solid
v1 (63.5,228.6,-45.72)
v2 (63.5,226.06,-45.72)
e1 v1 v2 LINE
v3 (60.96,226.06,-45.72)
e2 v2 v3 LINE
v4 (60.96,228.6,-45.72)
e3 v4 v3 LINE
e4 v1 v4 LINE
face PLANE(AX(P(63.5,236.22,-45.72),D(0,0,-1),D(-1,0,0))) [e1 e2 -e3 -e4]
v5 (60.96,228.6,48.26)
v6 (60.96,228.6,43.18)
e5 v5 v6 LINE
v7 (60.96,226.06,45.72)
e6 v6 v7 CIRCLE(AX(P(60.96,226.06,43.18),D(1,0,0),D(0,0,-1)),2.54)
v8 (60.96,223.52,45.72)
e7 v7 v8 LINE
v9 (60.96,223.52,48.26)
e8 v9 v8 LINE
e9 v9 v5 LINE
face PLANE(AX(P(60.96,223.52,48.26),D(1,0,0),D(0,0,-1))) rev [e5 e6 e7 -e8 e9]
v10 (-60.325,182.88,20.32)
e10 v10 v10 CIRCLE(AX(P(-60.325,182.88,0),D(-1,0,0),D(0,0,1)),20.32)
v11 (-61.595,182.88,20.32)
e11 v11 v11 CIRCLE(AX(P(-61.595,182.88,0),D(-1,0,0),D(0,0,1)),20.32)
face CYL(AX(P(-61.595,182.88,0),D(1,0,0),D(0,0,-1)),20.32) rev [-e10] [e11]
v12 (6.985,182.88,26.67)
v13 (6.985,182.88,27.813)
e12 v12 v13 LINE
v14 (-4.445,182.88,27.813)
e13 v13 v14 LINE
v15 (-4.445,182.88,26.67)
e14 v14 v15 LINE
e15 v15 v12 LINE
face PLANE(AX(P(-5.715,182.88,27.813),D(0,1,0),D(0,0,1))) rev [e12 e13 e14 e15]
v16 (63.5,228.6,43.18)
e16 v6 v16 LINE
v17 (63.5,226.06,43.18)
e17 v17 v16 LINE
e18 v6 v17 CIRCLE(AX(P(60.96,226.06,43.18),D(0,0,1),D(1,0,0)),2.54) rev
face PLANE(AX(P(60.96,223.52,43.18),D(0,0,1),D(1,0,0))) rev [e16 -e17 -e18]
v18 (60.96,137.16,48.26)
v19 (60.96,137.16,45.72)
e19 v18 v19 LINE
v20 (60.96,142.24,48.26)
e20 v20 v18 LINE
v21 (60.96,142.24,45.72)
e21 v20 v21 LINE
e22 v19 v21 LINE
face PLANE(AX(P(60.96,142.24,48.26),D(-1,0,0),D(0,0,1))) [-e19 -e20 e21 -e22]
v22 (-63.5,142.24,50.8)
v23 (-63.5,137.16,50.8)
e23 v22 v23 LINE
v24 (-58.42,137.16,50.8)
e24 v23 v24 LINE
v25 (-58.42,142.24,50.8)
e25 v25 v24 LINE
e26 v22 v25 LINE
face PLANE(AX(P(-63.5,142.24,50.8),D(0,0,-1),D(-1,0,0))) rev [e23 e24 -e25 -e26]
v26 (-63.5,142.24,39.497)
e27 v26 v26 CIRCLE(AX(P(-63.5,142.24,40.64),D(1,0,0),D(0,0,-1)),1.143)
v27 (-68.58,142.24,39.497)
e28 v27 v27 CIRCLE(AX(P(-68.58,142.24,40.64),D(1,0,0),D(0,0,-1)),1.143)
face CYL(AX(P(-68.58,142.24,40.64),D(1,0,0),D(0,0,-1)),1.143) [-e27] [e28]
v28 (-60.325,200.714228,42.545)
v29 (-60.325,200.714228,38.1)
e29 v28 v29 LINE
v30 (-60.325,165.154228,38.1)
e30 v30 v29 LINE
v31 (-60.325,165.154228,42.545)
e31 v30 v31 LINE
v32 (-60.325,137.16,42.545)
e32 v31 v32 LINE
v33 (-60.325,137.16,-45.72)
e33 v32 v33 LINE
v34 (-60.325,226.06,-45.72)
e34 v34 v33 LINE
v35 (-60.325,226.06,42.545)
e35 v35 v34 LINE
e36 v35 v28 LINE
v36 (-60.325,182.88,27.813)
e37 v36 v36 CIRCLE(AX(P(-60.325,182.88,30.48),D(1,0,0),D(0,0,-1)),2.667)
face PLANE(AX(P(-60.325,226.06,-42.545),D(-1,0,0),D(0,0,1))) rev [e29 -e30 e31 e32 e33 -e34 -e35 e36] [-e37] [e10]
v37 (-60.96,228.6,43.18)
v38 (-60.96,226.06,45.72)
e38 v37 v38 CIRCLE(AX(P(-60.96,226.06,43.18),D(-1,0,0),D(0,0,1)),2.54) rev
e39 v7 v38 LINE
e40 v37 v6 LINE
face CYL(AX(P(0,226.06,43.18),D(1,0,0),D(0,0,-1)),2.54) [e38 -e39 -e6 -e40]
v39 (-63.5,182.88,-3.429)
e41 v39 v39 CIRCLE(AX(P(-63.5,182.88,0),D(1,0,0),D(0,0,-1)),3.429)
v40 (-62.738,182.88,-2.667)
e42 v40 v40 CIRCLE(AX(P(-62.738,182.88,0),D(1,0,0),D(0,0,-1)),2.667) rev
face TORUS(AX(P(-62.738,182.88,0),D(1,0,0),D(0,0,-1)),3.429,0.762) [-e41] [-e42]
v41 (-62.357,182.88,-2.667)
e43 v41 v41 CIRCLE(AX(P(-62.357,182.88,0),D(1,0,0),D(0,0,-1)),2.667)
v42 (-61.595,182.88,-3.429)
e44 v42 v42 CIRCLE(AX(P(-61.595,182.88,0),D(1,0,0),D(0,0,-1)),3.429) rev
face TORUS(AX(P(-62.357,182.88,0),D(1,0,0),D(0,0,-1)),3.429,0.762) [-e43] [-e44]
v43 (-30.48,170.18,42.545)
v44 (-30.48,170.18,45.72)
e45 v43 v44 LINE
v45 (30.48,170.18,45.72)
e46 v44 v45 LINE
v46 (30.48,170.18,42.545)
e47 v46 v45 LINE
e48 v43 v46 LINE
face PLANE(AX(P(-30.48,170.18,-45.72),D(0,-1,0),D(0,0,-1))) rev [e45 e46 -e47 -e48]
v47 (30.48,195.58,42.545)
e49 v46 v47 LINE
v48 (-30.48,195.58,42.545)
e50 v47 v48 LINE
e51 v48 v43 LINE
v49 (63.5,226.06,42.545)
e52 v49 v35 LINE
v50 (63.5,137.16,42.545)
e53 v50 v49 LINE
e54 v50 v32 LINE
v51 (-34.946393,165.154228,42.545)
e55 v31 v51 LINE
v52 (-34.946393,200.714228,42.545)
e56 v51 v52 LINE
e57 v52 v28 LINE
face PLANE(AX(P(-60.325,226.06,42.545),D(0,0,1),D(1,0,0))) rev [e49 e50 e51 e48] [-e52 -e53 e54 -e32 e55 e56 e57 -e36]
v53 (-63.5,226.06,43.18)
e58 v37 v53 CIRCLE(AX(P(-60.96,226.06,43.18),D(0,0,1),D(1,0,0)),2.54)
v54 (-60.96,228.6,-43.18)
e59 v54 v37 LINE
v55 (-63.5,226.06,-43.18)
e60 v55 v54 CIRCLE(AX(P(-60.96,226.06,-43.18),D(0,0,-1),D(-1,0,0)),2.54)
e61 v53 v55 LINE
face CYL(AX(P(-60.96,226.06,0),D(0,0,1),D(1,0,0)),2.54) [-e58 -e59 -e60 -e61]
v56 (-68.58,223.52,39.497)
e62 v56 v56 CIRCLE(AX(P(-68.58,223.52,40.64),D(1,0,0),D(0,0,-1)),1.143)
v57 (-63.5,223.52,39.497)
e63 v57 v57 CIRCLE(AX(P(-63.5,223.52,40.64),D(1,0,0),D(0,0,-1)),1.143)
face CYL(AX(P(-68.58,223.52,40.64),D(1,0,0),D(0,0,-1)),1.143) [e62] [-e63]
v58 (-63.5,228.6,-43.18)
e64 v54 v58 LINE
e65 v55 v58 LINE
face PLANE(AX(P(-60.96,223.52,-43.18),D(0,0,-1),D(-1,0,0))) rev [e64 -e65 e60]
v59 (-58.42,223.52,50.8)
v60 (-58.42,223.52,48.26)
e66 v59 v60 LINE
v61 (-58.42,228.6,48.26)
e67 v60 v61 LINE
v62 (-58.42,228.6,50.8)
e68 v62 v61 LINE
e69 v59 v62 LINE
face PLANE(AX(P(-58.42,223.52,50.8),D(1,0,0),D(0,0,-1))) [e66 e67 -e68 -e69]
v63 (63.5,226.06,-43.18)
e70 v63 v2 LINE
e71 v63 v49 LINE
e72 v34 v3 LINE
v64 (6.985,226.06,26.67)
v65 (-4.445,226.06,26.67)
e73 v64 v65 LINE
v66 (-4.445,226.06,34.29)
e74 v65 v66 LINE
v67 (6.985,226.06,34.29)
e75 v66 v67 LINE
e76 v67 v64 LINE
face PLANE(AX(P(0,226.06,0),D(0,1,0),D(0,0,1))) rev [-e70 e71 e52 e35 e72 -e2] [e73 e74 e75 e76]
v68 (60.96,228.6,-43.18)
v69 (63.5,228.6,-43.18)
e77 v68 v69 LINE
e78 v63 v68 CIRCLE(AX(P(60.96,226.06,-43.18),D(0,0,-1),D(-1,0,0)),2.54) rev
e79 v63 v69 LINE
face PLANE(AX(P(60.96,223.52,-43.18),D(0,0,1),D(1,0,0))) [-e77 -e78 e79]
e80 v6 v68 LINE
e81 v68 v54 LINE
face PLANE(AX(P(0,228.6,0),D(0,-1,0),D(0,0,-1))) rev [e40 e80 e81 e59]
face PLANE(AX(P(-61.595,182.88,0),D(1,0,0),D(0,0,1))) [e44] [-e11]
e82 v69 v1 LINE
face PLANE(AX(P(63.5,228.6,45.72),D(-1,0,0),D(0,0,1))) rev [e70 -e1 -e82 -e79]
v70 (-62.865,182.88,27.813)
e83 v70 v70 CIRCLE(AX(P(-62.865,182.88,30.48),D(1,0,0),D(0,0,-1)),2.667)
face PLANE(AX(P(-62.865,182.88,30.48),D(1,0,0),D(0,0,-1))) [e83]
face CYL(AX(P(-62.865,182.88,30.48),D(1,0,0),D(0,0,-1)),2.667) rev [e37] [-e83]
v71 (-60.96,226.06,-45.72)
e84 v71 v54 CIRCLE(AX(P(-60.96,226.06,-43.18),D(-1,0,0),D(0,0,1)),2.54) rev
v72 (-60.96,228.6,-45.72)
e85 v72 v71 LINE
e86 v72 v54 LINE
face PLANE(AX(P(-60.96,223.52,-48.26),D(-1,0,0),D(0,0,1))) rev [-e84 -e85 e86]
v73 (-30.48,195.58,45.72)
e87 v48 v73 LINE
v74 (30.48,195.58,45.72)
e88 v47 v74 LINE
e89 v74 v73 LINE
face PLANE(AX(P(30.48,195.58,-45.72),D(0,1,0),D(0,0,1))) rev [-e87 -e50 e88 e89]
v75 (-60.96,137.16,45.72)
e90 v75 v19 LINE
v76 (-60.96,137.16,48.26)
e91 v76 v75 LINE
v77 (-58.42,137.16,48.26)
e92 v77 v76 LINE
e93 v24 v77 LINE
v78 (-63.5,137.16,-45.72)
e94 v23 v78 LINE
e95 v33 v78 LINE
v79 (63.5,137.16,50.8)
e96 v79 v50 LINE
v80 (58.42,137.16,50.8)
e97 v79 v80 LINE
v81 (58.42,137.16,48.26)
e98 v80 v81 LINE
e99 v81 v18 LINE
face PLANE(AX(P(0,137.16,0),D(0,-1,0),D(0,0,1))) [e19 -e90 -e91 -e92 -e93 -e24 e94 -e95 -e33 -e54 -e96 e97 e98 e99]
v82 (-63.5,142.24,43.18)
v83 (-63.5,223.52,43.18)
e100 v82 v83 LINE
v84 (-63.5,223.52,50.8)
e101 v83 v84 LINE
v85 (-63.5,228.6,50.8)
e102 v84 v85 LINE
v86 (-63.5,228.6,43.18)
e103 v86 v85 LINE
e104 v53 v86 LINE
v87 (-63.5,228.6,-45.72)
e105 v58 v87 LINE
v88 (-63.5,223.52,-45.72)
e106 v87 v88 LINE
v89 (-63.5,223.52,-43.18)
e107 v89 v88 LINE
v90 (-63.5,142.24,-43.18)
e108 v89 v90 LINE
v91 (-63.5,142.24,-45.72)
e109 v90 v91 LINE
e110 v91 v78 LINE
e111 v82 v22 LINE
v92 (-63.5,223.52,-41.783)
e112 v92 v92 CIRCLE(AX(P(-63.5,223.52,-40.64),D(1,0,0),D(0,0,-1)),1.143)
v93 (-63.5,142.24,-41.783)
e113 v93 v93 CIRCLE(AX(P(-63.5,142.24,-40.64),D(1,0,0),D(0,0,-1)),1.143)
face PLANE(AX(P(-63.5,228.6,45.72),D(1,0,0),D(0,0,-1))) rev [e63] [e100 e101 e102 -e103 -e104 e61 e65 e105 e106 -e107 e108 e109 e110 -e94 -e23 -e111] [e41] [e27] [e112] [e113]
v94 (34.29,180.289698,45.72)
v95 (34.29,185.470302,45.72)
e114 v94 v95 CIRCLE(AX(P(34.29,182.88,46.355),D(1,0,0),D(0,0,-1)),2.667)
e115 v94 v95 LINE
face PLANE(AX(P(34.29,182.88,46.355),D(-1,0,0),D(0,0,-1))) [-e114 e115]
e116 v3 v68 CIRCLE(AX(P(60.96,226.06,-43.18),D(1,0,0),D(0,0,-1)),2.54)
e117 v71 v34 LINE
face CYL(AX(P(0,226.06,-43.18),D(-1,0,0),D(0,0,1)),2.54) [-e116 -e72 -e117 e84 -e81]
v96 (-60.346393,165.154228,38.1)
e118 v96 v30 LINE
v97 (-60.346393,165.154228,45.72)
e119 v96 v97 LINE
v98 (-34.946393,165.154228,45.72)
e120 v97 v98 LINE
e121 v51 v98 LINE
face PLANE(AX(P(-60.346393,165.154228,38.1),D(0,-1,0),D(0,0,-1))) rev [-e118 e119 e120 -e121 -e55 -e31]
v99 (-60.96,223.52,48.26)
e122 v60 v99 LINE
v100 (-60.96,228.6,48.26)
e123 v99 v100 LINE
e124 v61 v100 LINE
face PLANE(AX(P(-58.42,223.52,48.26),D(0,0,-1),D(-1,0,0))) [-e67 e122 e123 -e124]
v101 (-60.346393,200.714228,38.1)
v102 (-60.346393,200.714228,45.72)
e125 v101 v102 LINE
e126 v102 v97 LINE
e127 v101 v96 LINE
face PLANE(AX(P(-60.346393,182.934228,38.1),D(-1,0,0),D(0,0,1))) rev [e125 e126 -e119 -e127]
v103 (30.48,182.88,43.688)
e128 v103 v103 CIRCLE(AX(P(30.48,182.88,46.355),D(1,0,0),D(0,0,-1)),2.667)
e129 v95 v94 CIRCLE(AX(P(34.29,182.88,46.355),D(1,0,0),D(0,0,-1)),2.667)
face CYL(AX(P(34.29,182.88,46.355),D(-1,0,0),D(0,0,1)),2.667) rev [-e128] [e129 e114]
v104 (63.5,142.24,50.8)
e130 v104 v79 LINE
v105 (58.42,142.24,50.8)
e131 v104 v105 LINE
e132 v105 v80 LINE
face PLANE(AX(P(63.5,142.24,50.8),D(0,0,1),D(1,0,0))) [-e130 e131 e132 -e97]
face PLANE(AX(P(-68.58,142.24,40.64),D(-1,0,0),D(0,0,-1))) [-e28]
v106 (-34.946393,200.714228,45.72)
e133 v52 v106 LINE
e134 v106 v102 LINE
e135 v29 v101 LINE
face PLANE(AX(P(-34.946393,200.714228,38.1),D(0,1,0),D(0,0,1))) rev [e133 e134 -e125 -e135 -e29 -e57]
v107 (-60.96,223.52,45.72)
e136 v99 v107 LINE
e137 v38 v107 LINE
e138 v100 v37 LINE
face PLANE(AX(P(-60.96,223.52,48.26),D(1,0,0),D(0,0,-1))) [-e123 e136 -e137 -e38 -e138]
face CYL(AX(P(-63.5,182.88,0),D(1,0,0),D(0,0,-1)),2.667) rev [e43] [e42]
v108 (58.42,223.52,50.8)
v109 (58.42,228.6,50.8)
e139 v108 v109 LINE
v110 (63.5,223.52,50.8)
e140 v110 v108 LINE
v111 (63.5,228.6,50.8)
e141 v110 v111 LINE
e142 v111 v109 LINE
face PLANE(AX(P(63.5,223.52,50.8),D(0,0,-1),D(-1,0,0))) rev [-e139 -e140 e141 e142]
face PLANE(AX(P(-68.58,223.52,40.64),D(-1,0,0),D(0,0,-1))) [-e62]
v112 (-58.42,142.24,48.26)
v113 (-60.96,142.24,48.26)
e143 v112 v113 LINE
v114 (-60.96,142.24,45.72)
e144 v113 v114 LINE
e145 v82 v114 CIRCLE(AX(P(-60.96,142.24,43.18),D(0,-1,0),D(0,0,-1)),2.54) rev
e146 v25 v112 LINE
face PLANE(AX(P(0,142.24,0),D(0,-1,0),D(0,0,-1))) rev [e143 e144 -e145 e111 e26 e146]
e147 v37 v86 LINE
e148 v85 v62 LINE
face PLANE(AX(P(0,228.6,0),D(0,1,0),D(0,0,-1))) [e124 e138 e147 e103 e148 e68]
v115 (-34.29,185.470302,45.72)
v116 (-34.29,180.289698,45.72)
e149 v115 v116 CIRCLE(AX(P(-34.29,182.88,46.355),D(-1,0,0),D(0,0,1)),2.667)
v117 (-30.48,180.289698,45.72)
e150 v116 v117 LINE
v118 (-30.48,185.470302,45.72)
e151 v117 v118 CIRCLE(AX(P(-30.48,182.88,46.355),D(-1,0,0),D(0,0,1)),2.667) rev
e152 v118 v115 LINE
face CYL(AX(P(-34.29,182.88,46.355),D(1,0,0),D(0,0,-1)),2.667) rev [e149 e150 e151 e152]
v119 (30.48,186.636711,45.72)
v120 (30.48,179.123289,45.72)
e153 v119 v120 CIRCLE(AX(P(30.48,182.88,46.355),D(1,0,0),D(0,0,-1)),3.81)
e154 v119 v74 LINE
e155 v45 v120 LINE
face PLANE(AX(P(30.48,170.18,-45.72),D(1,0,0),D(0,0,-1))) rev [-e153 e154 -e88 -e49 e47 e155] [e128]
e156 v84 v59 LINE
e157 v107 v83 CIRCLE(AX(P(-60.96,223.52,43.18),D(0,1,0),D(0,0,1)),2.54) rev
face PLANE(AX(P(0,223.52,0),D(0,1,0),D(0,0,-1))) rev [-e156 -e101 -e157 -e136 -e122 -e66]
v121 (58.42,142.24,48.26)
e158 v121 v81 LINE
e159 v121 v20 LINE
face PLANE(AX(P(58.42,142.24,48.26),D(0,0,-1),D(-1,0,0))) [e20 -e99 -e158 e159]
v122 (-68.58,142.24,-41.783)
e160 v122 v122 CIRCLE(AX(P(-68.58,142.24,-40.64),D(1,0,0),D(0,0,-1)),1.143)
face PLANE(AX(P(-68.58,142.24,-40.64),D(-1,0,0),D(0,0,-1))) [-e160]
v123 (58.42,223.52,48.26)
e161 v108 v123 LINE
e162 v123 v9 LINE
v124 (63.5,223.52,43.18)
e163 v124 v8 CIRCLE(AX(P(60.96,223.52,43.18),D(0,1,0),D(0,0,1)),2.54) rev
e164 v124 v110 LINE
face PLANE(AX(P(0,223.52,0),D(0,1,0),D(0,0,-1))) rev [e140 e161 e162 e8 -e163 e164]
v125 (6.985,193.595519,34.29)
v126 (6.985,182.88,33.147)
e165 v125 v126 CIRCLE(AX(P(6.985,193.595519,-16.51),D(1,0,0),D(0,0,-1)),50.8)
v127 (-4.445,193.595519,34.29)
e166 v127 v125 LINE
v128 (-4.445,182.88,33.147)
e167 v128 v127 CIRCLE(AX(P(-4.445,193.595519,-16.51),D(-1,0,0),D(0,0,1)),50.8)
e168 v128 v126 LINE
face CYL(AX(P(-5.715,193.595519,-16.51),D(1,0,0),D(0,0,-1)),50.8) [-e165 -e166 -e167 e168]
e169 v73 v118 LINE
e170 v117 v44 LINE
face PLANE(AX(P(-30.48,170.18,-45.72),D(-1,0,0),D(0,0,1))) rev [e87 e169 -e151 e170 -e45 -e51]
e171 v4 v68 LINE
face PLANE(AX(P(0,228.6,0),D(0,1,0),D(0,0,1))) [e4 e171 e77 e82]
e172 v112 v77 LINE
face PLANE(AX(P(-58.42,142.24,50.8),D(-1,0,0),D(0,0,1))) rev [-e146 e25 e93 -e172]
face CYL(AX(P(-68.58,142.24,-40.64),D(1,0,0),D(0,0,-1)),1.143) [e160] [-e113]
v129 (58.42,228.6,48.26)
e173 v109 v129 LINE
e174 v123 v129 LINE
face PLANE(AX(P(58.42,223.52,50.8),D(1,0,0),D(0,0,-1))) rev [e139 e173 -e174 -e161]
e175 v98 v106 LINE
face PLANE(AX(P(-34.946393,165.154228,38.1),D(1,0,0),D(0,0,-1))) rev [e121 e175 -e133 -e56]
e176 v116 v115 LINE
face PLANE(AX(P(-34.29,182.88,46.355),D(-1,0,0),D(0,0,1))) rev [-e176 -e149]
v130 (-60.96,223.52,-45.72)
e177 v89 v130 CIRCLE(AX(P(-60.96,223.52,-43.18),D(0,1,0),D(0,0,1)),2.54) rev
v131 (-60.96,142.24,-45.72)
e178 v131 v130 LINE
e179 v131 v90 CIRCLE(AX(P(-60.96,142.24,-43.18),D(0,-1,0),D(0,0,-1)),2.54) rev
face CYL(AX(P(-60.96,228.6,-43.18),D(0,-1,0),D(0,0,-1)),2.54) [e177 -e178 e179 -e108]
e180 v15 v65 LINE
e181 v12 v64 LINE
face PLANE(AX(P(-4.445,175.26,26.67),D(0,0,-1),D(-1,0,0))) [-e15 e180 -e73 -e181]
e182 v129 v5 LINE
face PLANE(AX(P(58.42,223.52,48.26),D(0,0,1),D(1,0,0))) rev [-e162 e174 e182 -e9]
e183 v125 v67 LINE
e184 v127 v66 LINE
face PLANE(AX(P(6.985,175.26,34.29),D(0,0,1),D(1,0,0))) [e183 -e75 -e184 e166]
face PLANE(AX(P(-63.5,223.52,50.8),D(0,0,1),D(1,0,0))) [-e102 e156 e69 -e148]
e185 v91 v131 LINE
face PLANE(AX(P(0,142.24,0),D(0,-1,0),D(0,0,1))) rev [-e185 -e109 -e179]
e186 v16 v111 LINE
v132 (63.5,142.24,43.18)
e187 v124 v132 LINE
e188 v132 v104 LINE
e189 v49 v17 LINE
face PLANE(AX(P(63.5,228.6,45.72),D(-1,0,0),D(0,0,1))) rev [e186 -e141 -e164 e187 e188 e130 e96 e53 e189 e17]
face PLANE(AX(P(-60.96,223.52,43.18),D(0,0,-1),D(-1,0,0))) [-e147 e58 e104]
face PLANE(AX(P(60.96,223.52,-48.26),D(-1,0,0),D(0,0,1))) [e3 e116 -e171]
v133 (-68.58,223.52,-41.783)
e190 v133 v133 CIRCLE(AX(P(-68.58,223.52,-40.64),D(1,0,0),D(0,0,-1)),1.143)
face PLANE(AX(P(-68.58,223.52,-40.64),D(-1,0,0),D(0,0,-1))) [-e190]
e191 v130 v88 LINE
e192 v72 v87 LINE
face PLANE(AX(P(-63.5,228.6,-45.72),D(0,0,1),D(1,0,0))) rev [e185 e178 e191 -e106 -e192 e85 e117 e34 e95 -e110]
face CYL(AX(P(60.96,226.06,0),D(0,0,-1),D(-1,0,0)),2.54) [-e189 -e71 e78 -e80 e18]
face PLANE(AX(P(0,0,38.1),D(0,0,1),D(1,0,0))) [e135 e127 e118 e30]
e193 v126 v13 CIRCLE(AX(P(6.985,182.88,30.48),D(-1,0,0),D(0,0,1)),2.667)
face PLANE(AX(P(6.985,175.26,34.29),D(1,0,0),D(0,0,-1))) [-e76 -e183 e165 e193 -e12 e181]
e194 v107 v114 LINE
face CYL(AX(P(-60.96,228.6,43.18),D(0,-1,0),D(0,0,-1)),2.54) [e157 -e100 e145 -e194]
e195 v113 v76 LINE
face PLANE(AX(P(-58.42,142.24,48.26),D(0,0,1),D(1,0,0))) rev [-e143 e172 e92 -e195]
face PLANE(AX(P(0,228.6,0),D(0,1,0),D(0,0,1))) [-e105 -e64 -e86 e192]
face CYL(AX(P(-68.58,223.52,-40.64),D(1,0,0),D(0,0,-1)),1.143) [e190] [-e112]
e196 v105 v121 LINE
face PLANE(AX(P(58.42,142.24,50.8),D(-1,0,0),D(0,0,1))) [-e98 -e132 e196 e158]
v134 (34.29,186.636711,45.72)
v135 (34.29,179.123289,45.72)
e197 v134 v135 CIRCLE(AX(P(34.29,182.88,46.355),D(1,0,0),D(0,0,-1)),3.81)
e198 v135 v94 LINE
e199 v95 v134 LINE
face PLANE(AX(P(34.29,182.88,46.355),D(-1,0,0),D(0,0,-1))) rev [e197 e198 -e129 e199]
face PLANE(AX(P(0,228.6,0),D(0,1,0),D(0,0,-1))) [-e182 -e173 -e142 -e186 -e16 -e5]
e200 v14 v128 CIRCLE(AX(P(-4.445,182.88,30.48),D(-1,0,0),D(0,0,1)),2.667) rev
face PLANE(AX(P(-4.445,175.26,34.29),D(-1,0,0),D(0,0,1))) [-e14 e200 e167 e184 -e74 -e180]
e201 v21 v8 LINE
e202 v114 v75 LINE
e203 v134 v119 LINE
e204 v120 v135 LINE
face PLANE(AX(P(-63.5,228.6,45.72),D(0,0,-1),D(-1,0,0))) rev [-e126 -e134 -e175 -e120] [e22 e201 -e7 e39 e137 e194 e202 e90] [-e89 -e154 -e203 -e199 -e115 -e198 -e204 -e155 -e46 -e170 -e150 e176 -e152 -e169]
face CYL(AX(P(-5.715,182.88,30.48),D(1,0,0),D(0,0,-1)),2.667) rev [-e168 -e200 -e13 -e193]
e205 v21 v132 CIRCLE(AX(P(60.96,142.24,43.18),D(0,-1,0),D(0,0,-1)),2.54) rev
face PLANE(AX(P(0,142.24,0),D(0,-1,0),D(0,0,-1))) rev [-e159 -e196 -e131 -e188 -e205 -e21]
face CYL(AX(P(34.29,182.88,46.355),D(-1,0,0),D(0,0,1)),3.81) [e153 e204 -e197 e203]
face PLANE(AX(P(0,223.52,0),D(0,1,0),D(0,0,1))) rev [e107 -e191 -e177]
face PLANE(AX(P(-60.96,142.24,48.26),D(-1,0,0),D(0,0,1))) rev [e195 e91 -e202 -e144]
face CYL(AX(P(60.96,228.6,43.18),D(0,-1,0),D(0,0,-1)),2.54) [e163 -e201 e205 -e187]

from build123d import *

# Parameters (mm, degrees)
SKETCH1_W            = 127
SKETCH1_H            = 91.44
BOSS_EXTRUDE1_DEPTH  = 228.6
SKETCH3_W            = 120.65
SKETCH3_H            = 85.09
CUT_EXTRUDE1_DEPTH   = 226.06
SKETCH2_R            = 2.667
CUT_EXTRUDE2_DEPTH   = 266.475570251
SKETCH4_R            = 1.143
BOSS_EXTRUDE3_DEPTH  = 5.08
SKETCH5_R            = 20.32
CUT_EXTRUDE3_DEPTH   = 1.27
FILLET1_R            = 0.762
FILLET2_R            = 0.762
FILLET3_R            = 0.762
SKETCH6_W            = 60.96
SKETCH6_H            = 25.4
CUT_EXTRUDE4_DEPTH   = 256.582569828
FILLET4_R            = 2.54
SKETCH7_W            = 85.09
SKETCH7_H            = 111.152565629
CUT_EXTRUDE5_DEPTH   = 268.942913323
SKETCH10_R           = 2.667
CUT_EXTRUDE6_DEPTH   = 2.54
CUT_EXTRUDE7_DEPTH   = 7.62
SKETCH13_R           = 2.667
CUT_EXTRUDE8_DEPTH   = 2.54
CUT_EXTRUDE9_DEPTH   = 7.62
SKETCH20_W           = 11.43
SKETCH20_H           = 7.62
BOSS_EXTRUDE4_DEPTH  = 50.8
CUT_EXTRUDE10_START  = -12.7
SKETCH21_R           = 2.667
CUT_EXTRUDE10_DEPTH  = 12.7
CUT_EXTRUDE11_DEPTH  = 12.7
SKETCH24_R           = 3.81
BOSS_EXTRUDE5_DEPTH  = 3.81
SKETCH25_R           = 2.667
CUT_EXTRUDE12_DEPTH  = 3.81
CUT_EXTRUDE13_DEPTH  = 12.7
CUT_EXTRUDE14_START  = 64.77
SKETCH27_R           = 2.667
CUT_EXTRUDE14_DEPTH  = 64.77
CUT_EXTRUDE15_START  = 64.77
SKETCH29_R           = 2.667
CUT_EXTRUDE15_DEPTH  = 64.77
FILLET6_R            = 50.8
FILLET7_R            = 50.8
BOSS_EXTRUDE6_DEPTH  = 5.08
MIRROR5_COPY_1_DEPTH = 5.08
MIRROR6_COPY_1_DEPTH = 5.08
MIRROR6_COPY_2_DEPTH = 5.08
MIRROR6_COPY_3_DEPTH = 5.08
SKETCH35_W           = 127
SKETCH35_H           = 137.16
CUT_EXTRUDE16_DEPTH  = 52.07
SKETCH39_W           = 85.09
SKETCH39_H           = 88.9
CUT_EXTRUDE20_DEPTH  = 52.07
SKETCH41_W           = 123.825
SKETCH41_H           = 88.9
CUT_EXTRUDE21_DEPTH  = 52.07
SKETCH42_W           = 127
SKETCH42_H           = 5.08
CUT_EXTRUDE22_DEPTH  = 236.22


with BuildPart() as part:
    # Sketch1 → Boss-Extrude1 (new body)
    with BuildSketch(Plane(origin=(0, 0, 0), x_dir=(1, 0, 0), z_dir=(0, 1, 0))):
        Rectangle(SKETCH1_W, SKETCH1_H)
    extrude(amount=BOSS_EXTRUDE1_DEPTH)

    # Sketch3 → Cut-Extrude1 (cut)
    with BuildSketch(Plane.XZ):
        Rectangle(SKETCH3_W, SKETCH3_H)
    extrude(amount=-CUT_EXTRUDE1_DEPTH, mode=Mode.SUBTRACT)

    # Sketch2 → Cut-Extrude2 (cut, through all)
    with BuildSketch(Plane(origin=(63.5, 0, 0), x_dir=(0, 0, -1), z_dir=(1, 0, 0))):
        with Locations((0, 182.88)):
            Circle(SKETCH2_R)
    extrude(amount=-CUT_EXTRUDE2_DEPTH, mode=Mode.SUBTRACT)

    # Sketch4 → Boss-Extrude3 (add)
    with BuildSketch(Plane(origin=(63.5, 0, 0), x_dir=(0, 0, -1), z_dir=(1, 0, 0))):
        with Locations(Location((-40.64, 223.52, 0), (0, 0, 180))):
            Circle(SKETCH4_R)
        with Locations(Location((40.64, 223.52, 0), (0, 0, 180))):
            Circle(SKETCH4_R)
        with Locations(Location((40.64, 142.24, 0), (0, 0, 180))):
            Circle(SKETCH4_R)
        with Locations(Location((-40.64, 142.24, 0), (0, 0, 180))):
            Circle(SKETCH4_R)
    boss_extrude3 = extrude(amount=BOSS_EXTRUDE3_DEPTH)

    # Sketch5 → Cut-Extrude3 (cut)
    with BuildSketch(Plane.ZY.offset(-60.325)):
        with Locations((0, 182.88)):
            Circle(SKETCH5_R)
    cut_extrude3 = extrude(amount=-CUT_EXTRUDE3_DEPTH, mode=Mode.SUBTRACT)

    # Fillet1
    fillet1_edges = [part.edges().sort_by_distance(p)[0] for p in [
        (61.595, 182.88, 2.667),
    ]]
    fillet(fillet1_edges, radius=FILLET1_R)

    # Fillet2
    fillet2_edges = [part.edges().sort_by_distance(p)[0] for p in [
        (63.5, 182.88, 2.667),
    ]]
    fillet(fillet2_edges, radius=FILLET2_R)

    # Mirror2: Boss-Extrude3, Cut-Extrude3 across plane
    add(boss_extrude3.mirror(Plane(origin=(0, 0, 0), x_dir=(0, 0, 1), z_dir=(1, 0, 0))))
    add(cut_extrude3.mirror(Plane(origin=(0, 0, 0), x_dir=(0, 0, 1), z_dir=(1, 0, 0))), mode=Mode.SUBTRACT)

    # Fillet3
    fillet3_edges = [part.edges().sort_by_distance(p)[0] for p in [
        (-63.5, 182.88, 2.667),
        (-61.595, 182.88, 2.667),
    ]]
    fillet(fillet3_edges, radius=FILLET3_R)

    # Sketch6 → Cut-Extrude4 (cut, through all)
    with BuildSketch(Plane.XY.offset(45.72)):
        with Locations((0, 182.88)):
            Rectangle(SKETCH6_W, SKETCH6_H)
    extrude(amount=-CUT_EXTRUDE4_DEPTH, mode=Mode.SUBTRACT)

    # Fillet4
    fillet4_edges = [part.edges().sort_by_distance(p)[0] for p in [
        (-63.5, 228.6, 0),
        (0, 228.6, 45.72),
        (63.5, 228.6, 0),
        (63.5, 114.3, 45.72),
        (-63.5, 114.3, 45.72),
        (-63.5, 114.3, -45.72),
        (63.5, 114.3, -45.72),
        (0, 228.6, -45.72),
    ]]
    fillet(fillet4_edges, radius=FILLET4_R)

    # Sketch7 → Cut-Extrude5 (cut, through all)
    with BuildSketch(Plane(origin=(63.5, 0, 0), x_dir=(0, 0, -1), z_dir=(1, 0, 0))):
        with Locations((0, 75.896282814)):
            Rectangle(SKETCH7_W, SKETCH7_H)
    extrude(amount=-CUT_EXTRUDE5_DEPTH, mode=Mode.SUBTRACT)

    # Sketch10 → Cut-Extrude6 (cut)
    with BuildSketch(Plane.ZY.offset(-60.325)):
        with Locations((-30.48, 182.88)):
            Circle(SKETCH10_R)
    extrude(amount=-CUT_EXTRUDE6_DEPTH, mode=Mode.SUBTRACT)

    # Sketch12 → Cut-Extrude7 (cut)
    with BuildSketch(Plane(origin=(0, 0, -45.72), x_dir=(-1, 0, 0), z_dir=(0, 0, -1))):
        Polygon((-34.810362372, 182.807903476), (-34.810362372, 200.587903476), (-60.210362372, 200.587903476), (-60.210362372, 182.807903476), (-60.210362372, 165.027903476), (-34.810362372, 165.027903476), align=None)
    extrude(amount=-CUT_EXTRUDE7_DEPTH, mode=Mode.SUBTRACT)

    # Sketch13 → Cut-Extrude8 (cut)
    with BuildSketch(Plane(origin=(-60.325, 0, 0), x_dir=(0, 0, -1), z_dir=(1, 0, 0))):
        with Locations((-30.48, 182.88)):
            Circle(SKETCH13_R)
    extrude(amount=-CUT_EXTRUDE8_DEPTH, mode=Mode.SUBTRACT)

    # Sketch16 → Cut-Extrude9 (cut)
    with BuildSketch(Plane.XY.offset(45.72)):
        Polygon((-60.34639287, 182.934228321), (-60.34639287, 200.714228321), (-34.94639287, 200.714228321), (-34.94639287, 165.154228321), (-60.34639287, 165.154228321), align=None)
    extrude(amount=-CUT_EXTRUDE9_DEPTH, mode=Mode.SUBTRACT)

    # Sketch20 → Boss-Extrude4 (add)
    with BuildSketch(Plane.XZ.offset(-226.06)):
        with Locations((1.27, -30.48)):
            Rectangle(SKETCH20_W, SKETCH20_H)
    boss_extrude4 = extrude(amount=BOSS_EXTRUDE4_DEPTH)

    # Sketch21 → Cut-Extrude10 (cut)
    with BuildSketch(Plane(origin=(6.985, 0, 0), x_dir=(0, 0, -1), z_dir=(1, 0, 0)).offset(CUT_EXTRUDE10_START)):
        with Locations(Location((30.48, 182.88, 0), (0, 0, 180))):
            Circle(SKETCH21_R)
    cut_extrude10 = extrude(amount=CUT_EXTRUDE10_DEPTH, mode=Mode.SUBTRACT)

    # Sketch23 → Cut-Extrude11 (cut)
    with BuildSketch(Plane(origin=(6.985, 0, 0), x_dir=(0, 0, -1), z_dir=(1, 0, 0))):
        Polygon((27.813, 182.88), (26.67, 182.88), (26.67, 175.26), (34.29, 175.26), (34.29, 182.88), align=None)
    extrude(amount=-CUT_EXTRUDE11_DEPTH, mode=Mode.SUBTRACT)

    # Sketch24 → Boss-Extrude5 (add)
    with BuildSketch(Plane.ZY.offset(-30.48)):
        with Locations((-46.355, 182.88)):
            Circle(SKETCH24_R)
    boss_extrude5 = extrude(amount=-BOSS_EXTRUDE5_DEPTH)

    # Sketch25 → Cut-Extrude12 (cut)
    with BuildSketch(Plane.ZY.offset(-30.48)):
        with Locations((-46.355, 182.88)):
            Circle(SKETCH25_R)
    cut_extrude12 = extrude(amount=-CUT_EXTRUDE12_DEPTH, mode=Mode.SUBTRACT)

    # Mirror3: Boss-Extrude4, Cut-Extrude10, Boss-Extrude5, Cut-Extrude12 across plane
    add(boss_extrude4.mirror(Plane.XY))
    add(cut_extrude10.mirror(Plane.XY), mode=Mode.SUBTRACT)
    add(boss_extrude5.mirror(Plane.XY))
    add(cut_extrude12.mirror(Plane.XY), mode=Mode.SUBTRACT)

    # Sketch26 → Cut-Extrude13 (cut)
    with BuildSketch(Plane(origin=(6.985, 0, 0), x_dir=(0, 0, -1), z_dir=(1, 0, 0))):
        Polygon((-27.813, 182.88), (-26.67, 182.88), (-26.67, 175.26), (-34.29, 175.26), (-34.29, 182.88), align=None)
    extrude(amount=-CUT_EXTRUDE13_DEPTH, mode=Mode.SUBTRACT)

    # Sketch27 → Cut-Extrude14 (cut)
    with BuildSketch(Plane.ZY.offset(-30.48).offset(CUT_EXTRUDE14_START)):
        with Locations((-46.355, 182.88)):
            Circle(SKETCH27_R)
    extrude(amount=-CUT_EXTRUDE14_DEPTH, mode=Mode.SUBTRACT)

    # Sketch29 → Cut-Extrude15 (cut)
    with BuildSketch(Plane.ZY.offset(-30.48).offset(CUT_EXTRUDE15_START)):
        with Locations(Location((46.355, 182.88, 0), (0, 0, 256.225853002))):
            Circle(SKETCH29_R)
    extrude(amount=-CUT_EXTRUDE15_DEPTH, mode=Mode.SUBTRACT)

    # Fillet6
    # the kernel refuses this fillet: 50.8 mm, written as the material it takes off along each edge
    with BuildSketch(Plane(origin=(33.773797915, 182.88, 34.29), x_dir=(0, 0, -1), z_dir=(-1, 0, 0))) as fillet6_piece_1:
        with BuildLine():
            CenterArc((50.8, -10.715519166), FILLET6_R, 167.822824326, 12.177175674)
            Line((0, -10.715519166), (-1.016, -10.715519166))
            Line((-1.016, -10.715519166), (-1.016, 0))
            Line((-1.016, 0), (0, 1.016))
            ThreePointArc((0, 1.016), (0.5715, 1.016), (0.14986, 0.214310383))
            Line((0.14986, 0.214310383), (1.143, 0))
        make_face()
    extrude(amount=65.007595831, mode=Mode.SUBTRACT)

    # Fillet7
    # the kernel refuses this fillet: 50.8 mm, written as the material it takes off along each edge
    with BuildSketch(Plane(origin=(33.773797915, 182.88, -34.29), x_dir=(0, 1, 0), z_dir=(-1, 0, 0))) as fillet7_piece_1:
        with BuildLine():
            CenterArc((10.715519166, -50.8), FILLET7_R, 90, 12.177175674)
            Line((0, -1.143), (0, 0))
            Line((0, 0), (10.715519166, 0))
        make_face()
    extrude(amount=65.007595831, mode=Mode.SUBTRACT)

    # Sketch33 → Boss-Extrude6 (add)
    with BuildSketch(Plane(origin=(0, 228.6, 0), x_dir=(1, 0, 0), z_dir=(0, 1, 0))):
        Polygon((63.5, 43.18), (63.5, 50.8), (58.42, 50.8), (58.42, 48.26), (60.96, 48.26), (60.96, 43.18), align=None)
    boss_extrude6 = extrude(amount=-BOSS_EXTRUDE6_DEPTH)

    # Mirror4: Boss-Extrude6 across plane
    add(boss_extrude6.mirror(Plane(origin=(0, 0, 0), x_dir=(0, 0, 1), z_dir=(1, 0, 0))))

    # Mirror5: Boss-Extrude6 across plane
    add(boss_extrude6.mirror(Plane.ZX.offset(182.88)))

    # Mirror5 copy 1 sketch → Mirror5 copy 1 (add)
    with BuildSketch(Plane(origin=(0, 137.16, 0), x_dir=(-1, 0, 0), z_dir=(0, -1, 0))):
        Polygon((63.5, 43.18), (63.5, 50.8), (58.42, 50.8), (58.42, 48.26), (60.96, 48.26), (60.96, 43.18), align=None)
    extrude(amount=-MIRROR5_COPY_1_DEPTH)

    # Mirror6: Boss-Extrude6 across plane
    add(boss_extrude6.mirror(Plane.XY))

    # Mirror6 copy 1 sketch → Mirror6 copy 1 (add)
    with BuildSketch(Plane(origin=(0, 228.6, 0), x_dir=(-1, 0, 0), z_dir=(0, 1, 0))):
        Polygon((63.5, 43.18), (63.5, 50.8), (58.42, 50.8), (58.42, 48.26), (60.96, 48.26), (60.96, 43.18), align=None)
    extrude(amount=-MIRROR6_COPY_1_DEPTH)

    # Mirror6 copy 2 sketch → Mirror6 copy 2 (add)
    with BuildSketch(Plane.XZ.offset(-137.16)):
        Polygon((63.5, 43.18), (63.5, 50.8), (58.42, 50.8), (58.42, 48.26), (60.96, 48.26), (60.96, 43.18), align=None)
    extrude(amount=-MIRROR6_COPY_2_DEPTH)

    # Mirror6 copy 3 sketch → Mirror6 copy 3 (add)
    with BuildSketch(Plane(origin=(0, 137.16, 0), x_dir=(-1, 0, 0), z_dir=(0, -1, 0))):
        Polygon((63.5, -43.18), (63.5, -50.8), (58.42, -50.8), (58.42, -48.26), (60.96, -48.26), (60.96, -43.18), align=None)
    extrude(amount=-MIRROR6_COPY_3_DEPTH)

    # Sketch35 → Cut-Extrude16 (cut, symmetric)
    with BuildSketch(Plane.XY):
        with Locations((0, 68.58)):
            Rectangle(SKETCH35_W, SKETCH35_H)
    extrude(amount=CUT_EXTRUDE16_DEPTH, both=True, mode=Mode.SUBTRACT)

    # Sketch39 → Cut-Extrude20 (cut, symmetric)
    with BuildSketch(Plane(origin=(63.5, 0, 0), x_dir=(0, 0, -1), z_dir=(1, 0, 0))):
        with Locations((0, 181.61)):
            Rectangle(SKETCH39_W, SKETCH39_H)
    extrude(amount=CUT_EXTRUDE20_DEPTH, both=True, mode=Mode.SUBTRACT)

    # Sketch41 → Cut-Extrude21 (cut, symmetric)
    with BuildSketch(Plane(origin=(0, 0, -45.72), x_dir=(-1, 0, 0), z_dir=(0, 0, -1))):
        with Locations((-1.5875, 181.61)):
            Rectangle(SKETCH41_W, SKETCH41_H)
    extrude(amount=CUT_EXTRUDE21_DEPTH, both=True, mode=Mode.SUBTRACT)

    # Sketch42 → Cut-Extrude22 (cut)
    with BuildSketch(Plane(origin=(0, 0, 0), x_dir=(1, 0, 0), z_dir=(0, 1, 0))):
        with Locations((0, 48.26)):
            Rectangle(SKETCH42_W, SKETCH42_H)
    extrude(amount=CUT_EXTRUDE22_DEPTH, mode=Mode.SUBTRACT)


solid = part.part
